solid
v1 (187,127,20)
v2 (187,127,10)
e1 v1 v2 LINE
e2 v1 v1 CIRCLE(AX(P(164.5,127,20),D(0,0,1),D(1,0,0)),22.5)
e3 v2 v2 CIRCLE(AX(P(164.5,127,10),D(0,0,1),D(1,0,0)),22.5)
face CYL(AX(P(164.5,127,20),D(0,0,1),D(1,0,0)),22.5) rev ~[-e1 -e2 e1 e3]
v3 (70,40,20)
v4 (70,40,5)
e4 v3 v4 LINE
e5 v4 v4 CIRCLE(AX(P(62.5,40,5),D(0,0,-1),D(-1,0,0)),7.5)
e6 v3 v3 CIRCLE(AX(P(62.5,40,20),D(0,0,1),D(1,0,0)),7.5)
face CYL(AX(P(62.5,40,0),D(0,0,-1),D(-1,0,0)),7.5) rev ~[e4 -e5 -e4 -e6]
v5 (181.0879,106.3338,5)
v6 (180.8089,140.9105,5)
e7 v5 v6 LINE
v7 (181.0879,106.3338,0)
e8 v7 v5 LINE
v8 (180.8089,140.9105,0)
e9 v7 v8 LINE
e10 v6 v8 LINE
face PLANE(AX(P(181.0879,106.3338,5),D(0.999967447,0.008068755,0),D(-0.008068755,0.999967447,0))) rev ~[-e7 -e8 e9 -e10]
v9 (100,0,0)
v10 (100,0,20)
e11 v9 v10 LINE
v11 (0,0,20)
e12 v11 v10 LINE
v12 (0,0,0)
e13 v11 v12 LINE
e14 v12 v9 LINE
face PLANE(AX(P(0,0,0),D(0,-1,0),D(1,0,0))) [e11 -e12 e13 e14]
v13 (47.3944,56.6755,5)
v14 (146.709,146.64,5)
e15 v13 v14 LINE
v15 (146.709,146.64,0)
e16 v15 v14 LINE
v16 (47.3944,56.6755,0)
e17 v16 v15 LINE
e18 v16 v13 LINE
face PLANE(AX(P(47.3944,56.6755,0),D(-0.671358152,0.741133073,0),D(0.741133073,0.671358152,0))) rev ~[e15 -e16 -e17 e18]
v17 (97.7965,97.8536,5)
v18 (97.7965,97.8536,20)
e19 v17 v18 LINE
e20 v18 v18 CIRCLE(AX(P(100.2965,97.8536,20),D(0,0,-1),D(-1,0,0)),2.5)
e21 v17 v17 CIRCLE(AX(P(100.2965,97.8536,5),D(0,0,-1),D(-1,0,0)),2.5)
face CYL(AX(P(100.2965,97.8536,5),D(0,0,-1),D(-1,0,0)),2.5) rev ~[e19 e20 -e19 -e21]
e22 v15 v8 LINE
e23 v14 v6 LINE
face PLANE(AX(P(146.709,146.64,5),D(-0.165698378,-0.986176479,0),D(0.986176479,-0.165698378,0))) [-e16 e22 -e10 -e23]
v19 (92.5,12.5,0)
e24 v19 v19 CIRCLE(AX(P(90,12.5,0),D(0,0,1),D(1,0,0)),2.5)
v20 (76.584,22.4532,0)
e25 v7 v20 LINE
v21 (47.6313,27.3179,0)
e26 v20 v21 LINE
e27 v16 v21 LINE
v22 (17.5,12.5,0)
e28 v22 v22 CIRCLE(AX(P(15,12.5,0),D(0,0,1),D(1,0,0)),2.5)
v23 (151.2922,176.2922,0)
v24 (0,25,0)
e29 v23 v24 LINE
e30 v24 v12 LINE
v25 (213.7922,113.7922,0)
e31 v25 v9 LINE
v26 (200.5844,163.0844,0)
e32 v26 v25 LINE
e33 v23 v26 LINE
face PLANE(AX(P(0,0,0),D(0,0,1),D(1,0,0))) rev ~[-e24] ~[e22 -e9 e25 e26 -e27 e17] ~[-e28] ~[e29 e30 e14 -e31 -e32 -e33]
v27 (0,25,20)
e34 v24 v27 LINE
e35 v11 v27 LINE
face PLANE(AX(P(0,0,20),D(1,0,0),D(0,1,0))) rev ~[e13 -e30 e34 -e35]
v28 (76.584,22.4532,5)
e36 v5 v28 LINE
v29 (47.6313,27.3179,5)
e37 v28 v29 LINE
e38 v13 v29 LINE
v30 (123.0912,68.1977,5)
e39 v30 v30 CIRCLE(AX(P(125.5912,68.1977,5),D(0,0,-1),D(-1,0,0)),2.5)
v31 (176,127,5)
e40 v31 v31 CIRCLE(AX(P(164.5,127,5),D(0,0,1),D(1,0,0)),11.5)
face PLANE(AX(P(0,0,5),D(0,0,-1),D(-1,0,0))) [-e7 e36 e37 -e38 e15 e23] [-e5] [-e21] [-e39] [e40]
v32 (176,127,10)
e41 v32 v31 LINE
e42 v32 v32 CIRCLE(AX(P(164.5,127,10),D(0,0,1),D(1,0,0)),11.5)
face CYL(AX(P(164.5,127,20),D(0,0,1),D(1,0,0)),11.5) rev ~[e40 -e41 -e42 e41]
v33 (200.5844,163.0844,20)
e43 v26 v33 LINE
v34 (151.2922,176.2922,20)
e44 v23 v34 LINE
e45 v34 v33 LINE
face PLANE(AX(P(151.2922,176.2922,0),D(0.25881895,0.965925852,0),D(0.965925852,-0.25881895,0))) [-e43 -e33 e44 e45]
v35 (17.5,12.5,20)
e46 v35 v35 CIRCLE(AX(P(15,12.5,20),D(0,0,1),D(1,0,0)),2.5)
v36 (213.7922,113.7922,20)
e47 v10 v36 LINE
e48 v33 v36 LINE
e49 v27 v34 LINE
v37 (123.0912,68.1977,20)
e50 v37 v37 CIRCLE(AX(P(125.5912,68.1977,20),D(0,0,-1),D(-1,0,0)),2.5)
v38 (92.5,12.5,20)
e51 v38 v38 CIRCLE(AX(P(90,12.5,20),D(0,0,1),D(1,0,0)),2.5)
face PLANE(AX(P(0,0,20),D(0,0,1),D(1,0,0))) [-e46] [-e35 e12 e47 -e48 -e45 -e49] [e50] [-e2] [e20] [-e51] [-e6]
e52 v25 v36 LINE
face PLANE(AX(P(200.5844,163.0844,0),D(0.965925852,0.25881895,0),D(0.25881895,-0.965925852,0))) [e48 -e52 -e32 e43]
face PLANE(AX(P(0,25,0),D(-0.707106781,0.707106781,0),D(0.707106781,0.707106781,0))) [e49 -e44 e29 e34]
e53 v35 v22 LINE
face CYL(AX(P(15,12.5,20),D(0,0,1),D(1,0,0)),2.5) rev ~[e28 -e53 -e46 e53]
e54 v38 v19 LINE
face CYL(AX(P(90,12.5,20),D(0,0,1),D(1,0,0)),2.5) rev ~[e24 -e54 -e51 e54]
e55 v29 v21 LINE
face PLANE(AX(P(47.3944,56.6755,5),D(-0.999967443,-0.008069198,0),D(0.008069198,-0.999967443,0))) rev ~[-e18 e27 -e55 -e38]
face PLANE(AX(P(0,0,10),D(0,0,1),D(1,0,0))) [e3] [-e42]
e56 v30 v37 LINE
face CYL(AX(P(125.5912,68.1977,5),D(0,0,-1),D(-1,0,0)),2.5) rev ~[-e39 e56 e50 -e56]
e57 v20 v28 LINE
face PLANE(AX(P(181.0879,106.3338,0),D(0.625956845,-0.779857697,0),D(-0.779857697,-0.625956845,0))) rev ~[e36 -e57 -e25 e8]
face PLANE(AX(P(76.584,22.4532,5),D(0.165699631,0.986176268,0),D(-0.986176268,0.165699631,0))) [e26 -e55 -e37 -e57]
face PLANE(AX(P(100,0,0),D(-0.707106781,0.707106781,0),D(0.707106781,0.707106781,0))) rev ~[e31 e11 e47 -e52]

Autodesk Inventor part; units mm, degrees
ref_plane "XZ Plane" through (0, 0, 0) normal (0, 1, 0) x (-1, 0, 0)
ref_plane "XY Plane" through (0, 0, 0) normal (0, 0, 1) x (1, 0, 0)
sketch "Sketch1" plane through (0, 0, 0) normal (0, 0, 1) x (1, 0, 0)
  line L0 (0, 0) -> (100, 0)
  line L1 (100, 0) -> (100, 25)
  line L2 (100, 25) -> (0, 25)
  line L3 (0, 25) -> (0, 0)
  line L4 (0, 25) -> (115.2078, 140.2078)
  line L5 (100, 0) -> (177.7078, 77.7078)
  line L6 (151.2922, 176.2922) -> (200.5844, 163.0844)
  line L7 (200.5844, 163.0844) -> (213.7922, 113.7922)
  line L8 (213.7922, 113.7922) -> (177.7078, 77.7078)
  line L9 (177.7078, 77.7078) -> (128.4156, 90.9156)
  line L10 (128.4156, 90.9156) -> (115.2078, 140.2078)
  line L11 (115.2078, 140.2078) -> (151.2922, 176.2922)
  circle A0 centre (164.5, 127) radius 4
  dimension "d0" = 100
  dimension "d1" = 25
  dimension "d6" = 8
  dimension "d8" = 45
  dimension "d15" = 127
extrude "Extrusion1" add sketch "Sketch1" along normal blind 20
sketch "Sketch2" plane through (0, 0, 20) normal (0, 0, 1) x (1, 0, 0)
  line L0 (0, 25) -> (0, 0) projected
  line L1 (0, 0) -> (100, 0) projected
  line L2 (0, 25) -> (100, 25)
  line L3 (100, 25) -> (100, 0)
  line L4 (100, 0) -> (0, 0)
  line L5 (0, 0) -> (0, 25)
  line L6 (100, 25) -> (125, 25)
  line L7 (100, 0) -> (213.7922, 113.7922) projected
  line L8 (100, 0) -> (125, 25)
extrude "Extrusion2" add sketch "Sketch2" along normal blind 250
sketch "Sketch4" plane through (0, 0, 270) normal (0, 0, 1) x (1, 0, 0)
  line L0 (0, 25) -> (125, 25) projected
  line L1 (125, 25) -> (213.7922, 113.7922) projected
  line L2 (213.7922, 113.7922) -> (200.5844, 163.0844) projected
  line L3 (200.5844, 163.0844) -> (151.2922, 176.2922) projected
  line L4 (151.2922, 176.2922) -> (0, 25) projected
  circle A0 centre (164.5, 127) radius 4 projected
  line L5 (100, 0) -> (125, 25) projected
  line L6 (125, 25) -> (0, 25) projected
  line L7 (0, 25) -> (0, 0) projected
  line L8 (0, 0) -> (100, 0) projected
extrude "Extrusion3" add sketch "Sketch4" along normal blind 20
sketch "Sketch5" plane through (0, 0, 0) normal (0, -1, 0) x (1, 0, 0)
  line L0 (0, 0) -> (100, 0) projected
  line L1 (100, 0) -> (100, 290) projected
  line L2 (0, 290) -> (100, 290) projected
  line L3 (0, 0) -> (0, 290) projected
  line L4 (0, 0) -> (-125.5737, 72.5)
  line L5 (-125.5737, 72.5) -> (-125.5737, 217.5)
  line L6 (-125.5737, 217.5) -> (0, 290)
  line L7 (0, 290) -> (125.5737, 217.5)
  line L8 (125.5737, 217.5) -> (125.5737, 72.5)
  line L9 (125.5737, 72.5) -> (0, 0)
  point P0 (0, 145)
extrude "Extrusion4" add sketch "Sketch5" against normal blind 25 contours L4 L5 L6 L3
sketch "Sketch6" plane through (0, 25, 20) normal (0, 1, 0) x (1, 0, 0)
  line L0 (100, 20) -> (100, -270) projected
  circle A0 centre (-24.528, -125) radius 3
  circle A1 centre (-31.528, -125) radius 1.5
  circle A2 centre (-21.028, -131.0622) radius 1.5
  circle A3 centre (-21.028, -118.9378) radius 1.5
  point P0 (0, 20)
  point P1 (100, -125)
  dimension "d18" = 6
  dimension "d19" = 124.528
  dimension "d20" = 3
  dimension "d21" = 7
  dimension "d24" = 360
extrude "Extrusion5" cut sketch "Sketch6" against normal through all
sketch "Sketch7" plane through (100, 0, 0) normal (0, -1, 0) x (1, 0, 0)
  circle A0 centre (-124.528, 145) radius 3 projected
  circle A1 centre (-124.528, 145) radius 12
  point P0 (-100, 0)
  dimension "d28" = 24
extrude "Extrusion6" cut sketch "Sketch7" against normal blind 5
sketch "Sketch8" plane through (0, 0, 270) normal (0, 0, -1) x (-1, 0, 0)
  circle A0 centre (-164.5, 127) radius 4 projected
  circle A1 centre (-164.5, 127) radius 12.5
  point P0 (0, 0)
  dimension "d31" = 25
extrude "Extrusion7" cut sketch "Sketch8" against normal blind 7
sketch "Sketch10" plane through (164.5, 127, 277) normal (0, 0, -1) x (-1, 0, 0)
  circle A0 centre (7, 0) radius 2
  circle A1 centre (0, 0) radius 4 projected
  circle A2 centre (-3.5, 6.0622) radius 2
  circle A3 centre (-3.5, -6.0622) radius 2
  point P0 (164.5, -127)
  dimension "d34" = 4
  dimension "d37" = 360
  dimension "d39" = 7
extrude "Extrusion8" cut sketch "Sketch10" against normal through all
sketch "Sketch11" plane through (0, 0, 290) normal (0, 0, 1) x (1, 0, 0)
  circle A0 centre (168, 133.0622) radius 2 projected
  circle A1 centre (164.5, 127) radius 4 projected
  circle A2 centre (168, 133.0622) radius 4
  circle A3 centre (157.5, 127) radius 4
  circle A4 centre (168, 120.9378) radius 4
  point P0 (0, 0)
  dimension "d42" = 8
  dimension "d45" = 360
extrude "Extrusion9" cut sketch "Sketch11" against normal blind 3 contours A0 | A1 A4 A3 A2 | A2 A1 | A1 A2 | A4 A1 | A1 A4 | A3 A1 | A1 A3
ref_plane "Work Plane1" through (164.5, 127, 270) normal (1, 0, 0) x (0, 0, 1)
sketch "Sketch12" plane through (164.5, 127, 270) normal (1, 0, 0) x (0, 0, 1)
  line L0 (17, -1.9365) -> (17, 1.9365) projected
  line L1 (17, 1.9365) -> (20, 1.9365) projected
  line L2 (20, 3.9993) -> (20, 1.9365) projected
  line L3 (20, 3.9993) -> (17, 3.9993) projected
  line L4 (17, 3.9993) -> (17, 2.0628) projected
  line L5 (17, 2.0628) -> (20, 2.0628) projected
  line L6 (20, -2.0628) -> (20, 2.0628) projected
  line L7 (20, -2.0628) -> (17, -2.0628) projected
  line L8 (17, -2.0628) -> (17, -3.9993) projected
  line L9 (17, -3.9993) -> (20, -3.9993) projected
  line L10 (20, -1.9365) -> (20, -3.9993) projected
  line L11 (20, -1.9365) -> (17, -1.9365) projected
  line L12 (7, 4) -> (7, -4) projected
  line L13 (7, -12.5) -> (7, 12.5) projected
  line L14 (0, -12.5) -> (0, 12.5) projected
  circle A0 centre (3.5, 0) radius 2
  line L15 (0, -12.5) -> (7, -12.5) projected
  point P0 (-270, 127)
  point P1 (7, 0)
  point P2 (3.5, -12.5)
  dimension "d50" = 4
extrude "Extrusion10" cut sketch "Sketch12" along normal through all contours A0
sketch "Sketch13" plane through (0, 0, 20) normal (0, 0, 1) x (1, 0, 0)
  line L0 (100, 0) -> (213.7922, 113.7922) projected
  line L1 (213.7922, 113.7922) -> (200.5844, 163.0844) projected
  line L2 (200.5844, 163.0844) -> (151.2922, 176.2922) projected
  line L3 (151.2922, 176.2922) -> (0, 25) projected
  line L4 (0, 25) -> (0, 0) projected
  line L5 (0, 0) -> (100, 0) projected
  arc A0 (161, 128.9365) -> (161, 125.0635) centre (157.5, 127) ccw projected
  arc A1 (164.5729, 130.9993) -> (161, 128.9365) centre (164.5, 127) ccw projected
  arc A2 (167.9271, 129.0628) -> (164.5729, 130.9993) centre (168, 133.0622) ccw projected
  arc A3 (167.9271, 124.9372) -> (167.9271, 129.0628) centre (164.5, 127) ccw projected
  arc A4 (164.5729, 123.0007) -> (167.9271, 124.9372) centre (168, 120.9378) ccw projected
  arc A5 (161, 125.0635) -> (164.5729, 123.0007) centre (164.5, 127) ccw projected
  line L6 (-125.5737, 25) -> (0, 25) projected
  line L7 (0, 0) -> (-125.5737, 0) projected
  line L8 (0, 25) -> (0, 0) projected
  line L9 (-125.5737, 25) -> (0, 25) projected
  line L10 (-125.5737, 0) -> (-125.5737, 25) projected
extrude "Extrusion11" cut sketch "Sketch13" along normal through all contours L5 L4 L3 L2 L1 L0 | L7 L10 L6 L4 | A1 A2 A3 A4 A5 A0
sketch "Sketch14" plane through (0, 0, 20) normal (0, 0, 1) x (1, 0, 0)
  line L0 (-34.641, 0) -> (0, 0) projected
  line L1 (151.2922, 176.2922) -> (0, 25) projected
  line L2 (0, 0) -> (0, 25)
  line L3 (-34.641, 0) -> (-34.641, 25) projected
  line L4 (0, 25) -> (-34.641, 25)
  line L5 (-34.641, 25) -> (-34.641, 0)
  line L6 (-34.641, 0) -> (0, 0)
extrude "Extrusion12" cut sketch "Sketch14" against normal through all
sketch "Sketch15" plane through (0, 0, 20) normal (0, 0, 1) x (1, 0, 0)
  line L0 (15, 12.5) -> (90, 12.5) construction
  line L1 (0, 0) -> (100, 0) projected
  circle A0 centre (15, 12.5) radius 2.5
  circle A1 centre (90, 12.5) radius 2.5
  dimension "d57" = 75
  dimension "d58" = 12.5
  dimension "d59" = 10
  dimension "d60" = 5
  dimension "d61" = 5
extrude "Extrusion13" cut sketch "Sketch15" against normal through all
sketch "Sketch16" plane through (0, 0, 20) normal (0, 0, 1) x (1, 0, 0)
  circle A0 centre (164.5, 127) radius 4 projected
  circle A1 centre (164.5, 127) radius 11.5
  point P0 (0, 0)
  dimension "d64" = 23
extrude "Extrusion14" cut sketch "Sketch16" against normal through all
sketch "Sketch17" plane through (0, 0, 20) normal (0, 0, 1) x (1, 0, 0)
  circle A0 centre (164.5, 127) radius 11.5 projected
  circle A1 centre (164.5, 127) radius 22.5
  point P0 (0, 0)
  dimension "d67" = 45
extrude "Extrusion15" cut sketch "Sketch17" against normal blind 10
sketch "Sketch18" plane through (0, 0, 20) normal (0, 0, 1) x (1, 0, 0)
  circle A0 centre (62.5, 40) radius 7.5
  line L0 (0, 25) -> (0, 0) projected
  line L1 (0, 25) -> (125, 25)
  line L2 (100, 0) -> (213.7922, 113.7922) projected
  point P0 (62.5, 25)
  dimension "d70" = 15
  dimension "d71" = 15
extrude "Extrusion16" cut sketch "Sketch18" against normal through all
sketch "Sketch19" plane through (0, 0, 0) normal (0, 0, -1) x (-1, 0, 0)
  line L0 (-156.7794, 135.523) -> (-57.4648, 45.5585)
  circle A0 centre (-62.5, 40) radius 7.5 projected
  line L1 (-67.1947, 34.1511) -> (-171.6985, 118.0316)
  circle A1 centre (-164.5, 127) radius 11.5 projected
  circle A2 centre (-62.5, 40) radius 7.5 projected
  arc A3 (-156.7794, 135.523) -> (-171.6985, 118.0316) centre (-164.5, 127) ccw
  arc A4 (-67.1947, 34.1511) -> (-57.4648, 45.5585) centre (-62.5, 40) ccw
  point P0 (0, 0)
extrude "Extrusion17" cut sketch "Sketch19" against normal blind 4
sketch "Sketch20" plane through (0, 0, 0) normal (0, 0, -1) x (-1, 0, 0)
  arc A0 (-156.7794, 135.523) -> (-171.6985, 118.0316) centre (-164.5, 127) ccw projected
  line L0 (-156.7794, 135.523) -> (-57.4648, 45.5585) projected
  line L1 (-67.1947, 34.1511) -> (-171.6985, 118.0316) projected
  arc A1 (-67.1947, 34.1511) -> (-57.4648, 45.5585) centre (-62.5, 40) ccw projected
  line L2 (-47.3944, 56.6755) -> (-146.709, 146.64)
  arc A2 (-146.709, 146.64) -> (-181.0879, 106.3338) centre (-164.5, 127) ccw
  line L3 (-181.0879, 106.3338) -> (-76.584, 22.4532)
  arc A3 (-76.584, 22.4532) -> (-47.3944, 56.6755) centre (-62.5, 40) ccw
  point P0 (0, 0)
  dimension "d76" = 15
extrude "Extrusion18" cut sketch "Sketch20" against normal blind 5 contours L0 A1 L1 A0 | A3 L3 A2 L2
sketch "Sketch21" plane through (0, 0, 5) normal (0, 0, -1) x (-1, 0, 0)
  circle A0 centre (-62.5, 40) radius 7.5 projected
  circle A1 centre (-164.5, 127) radius 11.5 projected
  line L0 (-146.709, 146.64) -> (-47.3944, 56.6755) projected
  arc A2 (-146.709, 146.64) -> (-181.0879, 106.3338) centre (-164.5, 127) ccw projected
  line L1 (-76.584, 22.4532) -> (-181.0879, 106.3338) projected
  arc A3 (-76.584, 22.4532) -> (-47.3944, 56.6755) centre (-62.5, 40) ccw projected
  line L2 (-76.584, 22.4532) -> (-181.0879, 106.3338) projected
  line L3 (-128.8359, 64.3935) -> (-97.0517, 101.6578) construction
  line L4 (-146.709, 146.64) -> (-47.3944, 56.6755) projected
  circle A4 centre (-125.5912, 68.1977) radius 2.5
  circle A5 centre (-100.2965, 97.8536) radius 2.5
  point P0 (0, 0)
  dimension "d79" = 5
  dimension "d80" = 5
  dimension "d81" = 5
  dimension "d82" = 5
extrude "Extrusion19" cut sketch "Sketch21" against normal through all contours A4 | A5
sketch "Sketch22" plane through (0, 0, 5) normal (0, 0, -1) x (-1, 0, 0)
  arc A0 (-146.709, 146.64) -> (-181.0879, 106.3338) centre (-164.5, 127) ccw projected
  arc A1 (-76.584, 22.4532) -> (-47.3944, 56.6755) centre (-62.5, 40) ccw projected
  line L0 (-180.8089, 140.9105) -> (-47.6313, 27.3179)
  line L1 (-76.584, 22.4532) -> (-181.0879, 106.3338) projected
  line L2 (-181.0879, 106.3338) -> (-180.8089, 140.9105)
  line L3 (-146.709, 146.64) -> (-180.8089, 140.9105)
  line L4 (-76.584, 22.4532) -> (-47.6313, 27.3179)
  line L5 (-47.3944, 56.6755) -> (-47.6313, 27.3179)
  point P0 (0, 0)
  dimension "d85" = 100
  dimension "d86" = 100
extrude "Extrusion20" add sketch "Sketch22" along normal blind 5 contours L3 L2 A0 | L4 L5 A1
properties part number "HA02" material "ABS Plastic"
